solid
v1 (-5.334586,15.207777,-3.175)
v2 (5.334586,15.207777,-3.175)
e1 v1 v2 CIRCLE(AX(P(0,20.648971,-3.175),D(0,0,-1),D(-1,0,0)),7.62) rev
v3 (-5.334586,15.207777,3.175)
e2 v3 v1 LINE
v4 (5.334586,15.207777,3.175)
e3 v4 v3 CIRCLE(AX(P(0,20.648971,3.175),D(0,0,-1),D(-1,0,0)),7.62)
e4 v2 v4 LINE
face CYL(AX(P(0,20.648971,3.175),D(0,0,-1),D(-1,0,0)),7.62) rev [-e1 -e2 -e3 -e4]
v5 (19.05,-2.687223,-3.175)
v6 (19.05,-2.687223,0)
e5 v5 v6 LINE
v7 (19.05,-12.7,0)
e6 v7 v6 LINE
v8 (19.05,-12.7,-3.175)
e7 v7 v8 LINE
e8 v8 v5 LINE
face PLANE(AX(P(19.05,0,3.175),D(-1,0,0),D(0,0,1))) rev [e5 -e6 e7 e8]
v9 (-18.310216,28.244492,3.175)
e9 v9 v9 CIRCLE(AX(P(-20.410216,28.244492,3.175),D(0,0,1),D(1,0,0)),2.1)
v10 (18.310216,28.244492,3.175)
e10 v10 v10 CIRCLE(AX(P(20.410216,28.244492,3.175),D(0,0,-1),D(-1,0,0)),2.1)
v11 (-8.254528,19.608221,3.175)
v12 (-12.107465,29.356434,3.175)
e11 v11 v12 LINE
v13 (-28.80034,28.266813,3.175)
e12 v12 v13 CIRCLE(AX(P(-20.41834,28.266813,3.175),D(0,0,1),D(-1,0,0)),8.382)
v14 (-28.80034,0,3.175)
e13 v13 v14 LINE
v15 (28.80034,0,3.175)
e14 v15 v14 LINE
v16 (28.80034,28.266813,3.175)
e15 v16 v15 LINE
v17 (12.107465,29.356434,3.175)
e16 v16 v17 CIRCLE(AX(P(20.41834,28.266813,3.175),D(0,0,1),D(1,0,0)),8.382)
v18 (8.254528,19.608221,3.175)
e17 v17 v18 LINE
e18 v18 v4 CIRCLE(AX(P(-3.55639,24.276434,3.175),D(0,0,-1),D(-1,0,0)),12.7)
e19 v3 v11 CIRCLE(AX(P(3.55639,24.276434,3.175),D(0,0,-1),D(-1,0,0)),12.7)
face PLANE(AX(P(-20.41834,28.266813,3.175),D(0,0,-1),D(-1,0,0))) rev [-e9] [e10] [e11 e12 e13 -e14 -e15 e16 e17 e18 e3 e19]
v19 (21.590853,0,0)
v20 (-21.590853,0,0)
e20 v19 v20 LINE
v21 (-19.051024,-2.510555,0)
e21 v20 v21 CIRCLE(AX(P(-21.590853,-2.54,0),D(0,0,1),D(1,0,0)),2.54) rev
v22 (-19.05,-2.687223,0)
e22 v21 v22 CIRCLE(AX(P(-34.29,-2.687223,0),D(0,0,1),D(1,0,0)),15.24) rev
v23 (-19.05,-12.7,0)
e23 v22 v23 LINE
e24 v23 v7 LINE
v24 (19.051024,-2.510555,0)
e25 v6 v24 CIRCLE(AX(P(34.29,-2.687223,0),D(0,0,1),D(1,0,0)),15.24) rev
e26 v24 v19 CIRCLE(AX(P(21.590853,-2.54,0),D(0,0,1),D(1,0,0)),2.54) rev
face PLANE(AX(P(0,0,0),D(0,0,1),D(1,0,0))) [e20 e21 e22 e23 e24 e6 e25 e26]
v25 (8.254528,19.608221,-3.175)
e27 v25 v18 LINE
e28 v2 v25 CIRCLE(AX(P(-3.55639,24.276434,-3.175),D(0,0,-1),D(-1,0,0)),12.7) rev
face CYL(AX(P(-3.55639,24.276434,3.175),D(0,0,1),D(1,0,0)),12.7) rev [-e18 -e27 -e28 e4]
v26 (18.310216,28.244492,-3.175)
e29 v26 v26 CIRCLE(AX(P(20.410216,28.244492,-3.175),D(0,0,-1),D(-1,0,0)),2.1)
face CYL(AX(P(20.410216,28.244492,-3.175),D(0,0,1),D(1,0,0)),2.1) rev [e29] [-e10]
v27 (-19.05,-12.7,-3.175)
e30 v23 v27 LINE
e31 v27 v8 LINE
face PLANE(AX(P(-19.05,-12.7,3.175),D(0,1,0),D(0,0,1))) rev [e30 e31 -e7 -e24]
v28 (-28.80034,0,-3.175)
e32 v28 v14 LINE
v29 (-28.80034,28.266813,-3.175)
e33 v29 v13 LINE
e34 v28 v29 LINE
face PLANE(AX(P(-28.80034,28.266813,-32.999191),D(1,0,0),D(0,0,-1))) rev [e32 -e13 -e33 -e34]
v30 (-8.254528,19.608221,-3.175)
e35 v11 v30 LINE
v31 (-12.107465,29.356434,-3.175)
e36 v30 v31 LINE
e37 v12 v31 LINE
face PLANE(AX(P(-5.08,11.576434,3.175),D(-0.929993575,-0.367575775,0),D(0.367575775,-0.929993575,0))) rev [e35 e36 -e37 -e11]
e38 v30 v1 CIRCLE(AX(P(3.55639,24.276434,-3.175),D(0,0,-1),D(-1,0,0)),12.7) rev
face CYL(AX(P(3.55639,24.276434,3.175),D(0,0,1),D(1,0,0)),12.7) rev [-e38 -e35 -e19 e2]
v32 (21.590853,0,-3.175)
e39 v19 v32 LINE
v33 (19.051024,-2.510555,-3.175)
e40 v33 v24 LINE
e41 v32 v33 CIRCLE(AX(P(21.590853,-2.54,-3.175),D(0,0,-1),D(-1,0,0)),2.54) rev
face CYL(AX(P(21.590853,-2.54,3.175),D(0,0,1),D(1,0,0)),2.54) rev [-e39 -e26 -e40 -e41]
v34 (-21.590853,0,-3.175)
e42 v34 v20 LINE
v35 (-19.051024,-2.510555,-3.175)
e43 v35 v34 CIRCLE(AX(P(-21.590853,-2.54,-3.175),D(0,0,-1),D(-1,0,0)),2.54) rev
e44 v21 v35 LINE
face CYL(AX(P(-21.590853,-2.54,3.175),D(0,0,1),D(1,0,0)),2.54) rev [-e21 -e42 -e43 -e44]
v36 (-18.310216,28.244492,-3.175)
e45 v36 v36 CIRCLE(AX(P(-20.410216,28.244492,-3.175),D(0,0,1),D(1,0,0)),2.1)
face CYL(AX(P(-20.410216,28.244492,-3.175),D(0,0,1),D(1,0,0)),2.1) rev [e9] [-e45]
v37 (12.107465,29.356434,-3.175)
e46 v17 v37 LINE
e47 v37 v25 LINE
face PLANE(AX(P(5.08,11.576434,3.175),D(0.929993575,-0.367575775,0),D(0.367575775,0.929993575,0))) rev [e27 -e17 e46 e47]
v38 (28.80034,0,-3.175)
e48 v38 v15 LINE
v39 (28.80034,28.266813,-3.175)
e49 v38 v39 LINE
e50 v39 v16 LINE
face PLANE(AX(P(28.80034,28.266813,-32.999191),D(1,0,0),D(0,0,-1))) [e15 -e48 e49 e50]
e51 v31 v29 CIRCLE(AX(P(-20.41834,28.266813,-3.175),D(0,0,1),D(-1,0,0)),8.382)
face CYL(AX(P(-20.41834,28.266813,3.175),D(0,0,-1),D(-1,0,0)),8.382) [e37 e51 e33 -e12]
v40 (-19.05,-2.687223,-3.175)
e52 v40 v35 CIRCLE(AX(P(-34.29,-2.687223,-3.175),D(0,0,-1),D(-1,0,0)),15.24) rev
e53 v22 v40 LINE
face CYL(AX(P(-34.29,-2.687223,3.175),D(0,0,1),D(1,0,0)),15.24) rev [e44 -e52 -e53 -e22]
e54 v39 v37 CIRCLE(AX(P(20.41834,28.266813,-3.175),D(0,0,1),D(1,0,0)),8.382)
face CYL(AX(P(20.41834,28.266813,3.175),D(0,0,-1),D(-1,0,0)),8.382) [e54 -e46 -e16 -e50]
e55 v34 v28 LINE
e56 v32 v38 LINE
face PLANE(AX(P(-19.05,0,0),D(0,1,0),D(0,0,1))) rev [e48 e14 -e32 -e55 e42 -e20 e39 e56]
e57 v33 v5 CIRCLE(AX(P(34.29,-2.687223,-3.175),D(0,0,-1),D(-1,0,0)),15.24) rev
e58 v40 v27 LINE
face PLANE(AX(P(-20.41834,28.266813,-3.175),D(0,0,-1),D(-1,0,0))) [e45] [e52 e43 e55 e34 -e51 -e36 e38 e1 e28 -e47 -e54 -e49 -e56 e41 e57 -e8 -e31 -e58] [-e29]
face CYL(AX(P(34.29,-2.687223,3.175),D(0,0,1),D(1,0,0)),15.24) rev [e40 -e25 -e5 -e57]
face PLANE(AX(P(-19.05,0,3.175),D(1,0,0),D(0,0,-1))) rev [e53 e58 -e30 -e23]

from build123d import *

# Parameters (mm, degrees)
BOSS_EXTRU_1_DEPTH             = 3.175
ESQUISSE3_R                    = 2.1
ENL_V_MAT_EXTRU_1_DEPTH        = 48.041658028
ESQUISSE4_W                    = 38.1
ESQUISSE4_H                    = 12.7
ENL_V_MAT_EXTRU_2_DEPTH        = 3.175
CONG_1_R                       = 12.7
CONG_4_R                       = 7.62
CONG_5_R                       = 15.24
BOSS_EXTRU_4_REACH             = 48.719
BOSS_EXTRU_4_DIRECTION_2_REACH = 48.719
CONG_6_R                       = 2.54
BOSS_EXTRU_5_REACH             = 49.042


with BuildPart() as part:
    # Esquisse2 → Boss.-Extru.1 (new, symmetric)
    with BuildSketch(Plane.XY):
        with BuildLine():
            Line((19.05, 0), (28.29484395, 25.4))
            ThreePointArc((28.29484395, 25.4), (22.40844386, 36.409135129), (12.107464983, 29.356433767))
            Line((12.107464983, 29.356433767), (5.08, 11.576433767))
            Line((5.08, 11.576433767), (-5.08, 11.576433767))
            Line((-5.08, 11.576433767), (-12.107464983, 29.356433767))
            ThreePointArc((-12.107464983, 29.356433767), (-22.40844386, 36.409135129), (-28.29484395, 25.4))
            Line((-28.29484395, 25.4), (-19.05, 0))
            Line((-19.05, 0), (-19.05, -12.7))
            Line((-19.05, -12.7), (19.05, -12.7))
            Line((19.05, -12.7), (19.05, 0))
        make_face()
    extrude(amount=BOSS_EXTRU_1_DEPTH, both=True)

    # Esquisse3 → Enlèv. mat.-Extru.1 (cut, through all)
    with BuildSketch(Plane.XY.offset(3.175)):
        with Locations((-20.410216204, 28.244491788)):
            Circle(ESQUISSE3_R)
    enl_v_mat_extru_1 = extrude(amount=-ENL_V_MAT_EXTRU_1_DEPTH, mode=Mode.SUBTRACT)

    # Symétrie1: Enlèv. mat.-Extru.1 across plane
    add(enl_v_mat_extru_1.mirror(Plane(origin=(0, 0, 0), x_dir=(0, 0, 1), z_dir=(1, 0, 0))), mode=Mode.SUBTRACT)

    # Esquisse4 → Enlèv. mat.-Extru.2 (cut)
    with BuildSketch(Plane.XY.offset(3.175)):
        with Locations((0, -6.35)):
            Rectangle(ESQUISSE4_W, ESQUISSE4_H)
    extrude(amount=-ENL_V_MAT_EXTRU_2_DEPTH, mode=Mode.SUBTRACT)

    # Congé1
    # the kernel refuses this fillet: 12.7 mm, written as the material it adds along each edge
    with BuildSketch(Plane(origin=(5.08, 11.576433767, -3.175), x_dir=(0.3675757751944704, 0.9299935749725285, 0), z_dir=(0, 0, 1)), Plane(origin=(-5.08, 11.576433767, -3.175), x_dir=(1, 0, 0), z_dir=(0, 0, 1))) as cong_1_piece_1:
        with BuildLine():
            CenterArc((CONG_1_R * 0.68003074626, CONG_1_R), CONG_1_R, 201.566186537, 68.433813463)
            Line((-CONG_1_R * 0.249962828713, CONG_1_R * 0.632424224806), (0, 0))
            Line((0, 0), (CONG_1_R * 0.68003074626, 0))
        make_face()
    extrude(amount=6.35)

    # Congé4
    cong_4_edges = [part.edges().sort_by_distance(p)[0] for p in [
        (0, 12.084547663, 0),
    ]]
    fillet(cong_4_edges, radius=CONG_4_R)

    # Congé5
    cong_5_edges = [part.edges().sort_by_distance(p)[0] for p in [
        (-19.05, 0, -1.5875),
        (19.05, 0, -1.5875),
    ]]
    fillet(cong_5_edges, radius=CONG_5_R)

    # Boss.-Extru.4: up to this face of the body (flat: up to its plane)
    boss_extru_4_end = Plane(part.part.faces().sort_by_distance((9.3e-08, 10.23403755, -3.175))[0])
    # Esquisse6 → Boss.-Extru.4 (add, up to the picked face)
    with BuildSketch(Plane.XY, mode=Mode.PRIVATE) as boss_extru_4_sk1:
        with BuildLine():
            Line((28.800340403, 28.266812841), (28.800340403, 0))
            Line((28.800340403, 0), (19.288785664, 0))
            ThreePointArc((19.288785664, 0), (19.57466996, 1.27720134), (19.969084459, 2.525163798))
            Line((19.969084459, 2.525163798), (28.29484395, 25.4))
            ThreePointArc((28.29484395, 25.4), (28.672998989, 26.811293816), (28.800340403, 28.266812841))
        make_face()
    boss_extru_4_tool1 = split(extrude(boss_extru_4_sk1.sketch, amount=-BOSS_EXTRU_4_REACH, mode=Mode.PRIVATE), bisect_by=boss_extru_4_end, keep=Keep.BOTH, mode=Mode.PRIVATE)
    boss_extru_4 = boss_extru_4_tool1.solids().sort_by(Axis((25.562927, 8.959806, 0), (0, 0, -1)))[0]
    add(boss_extru_4)

    # Boss.-Extru.4 direction 2: up to this face of the body (flat: up to its plane)
    boss_extru_4_direction_2_end = Plane(part.part.faces().sort_by_distance((7.594682873, 16.877070462, 3.175))[0])
    # Esquisse6 → Boss.-Extru.4 direction 2 (add, up to the picked face)
    with BuildSketch(Plane.XY, mode=Mode.PRIVATE) as boss_extru_4_direction_2_sk1:
        with BuildLine():
            Line((28.800340403, 28.266812841), (28.800340403, 0))
            Line((28.800340403, 0), (19.288785664, 0))
            ThreePointArc((19.288785664, 0), (19.57466996, 1.27720134), (19.969084459, 2.525163798))
            Line((19.969084459, 2.525163798), (28.29484395, 25.4))
            ThreePointArc((28.29484395, 25.4), (28.672998989, 26.811293816), (28.800340403, 28.266812841))
        make_face()
    boss_extru_4_direction_2_tool1 = split(extrude(boss_extru_4_direction_2_sk1.sketch, amount=BOSS_EXTRU_4_DIRECTION_2_REACH, mode=Mode.PRIVATE), bisect_by=boss_extru_4_direction_2_end, keep=Keep.BOTH, mode=Mode.PRIVATE)
    boss_extru_4_direction_2 = boss_extru_4_direction_2_tool1.solids().sort_by(Axis((25.562927, 8.959806, 0), (0, 0, 1)))[0]
    add(boss_extru_4_direction_2)

    # Symétrie3: Boss.-Extru.4, Boss.-Extru.4 direction 2 across plane
    add(boss_extru_4.mirror(Plane(origin=(0, 0, 0), x_dir=(0, 0, 1), z_dir=(1, 0, 0))))
    add(boss_extru_4_direction_2.mirror(Plane(origin=(0, 0, 0), x_dir=(0, 0, 1), z_dir=(1, 0, 0))))

    # Congé6
    cong_6_edges = [part.edges().sort_by_distance(p)[0] for p in [
        (-19.288785664, 0, -1.5875),
        (19.288785664, 0, -1.5875),
    ]]
    fillet(cong_6_edges, radius=CONG_6_R)

    # Esquisse7 → Boss.-Extru.5 (add, up to next)
    with BuildSketch(Plane.XY.offset(3.175), mode=Mode.PRIVATE) as boss_extru_5_sk1:
        with BuildLine():
            Line((-19.288785664, 0), (-19.05, 0))
            Line((-19.05, 0), (-19.969084459, 2.525163798))
            ThreePointArc((-19.969084459, 2.525163798), (-19.57466996, 1.27720134), (-19.288785664, 0))
        make_face()
    boss_extru_5_tool1 = extrude(boss_extru_5_sk1.sketch, amount=-BOSS_EXTRU_5_REACH, mode=Mode.PRIVATE) - part.part
    boss_extru_5 = boss_extru_5_tool1.solids().sort_by_distance((-19.353449, 0.636158, 3.175))[0]
    add(boss_extru_5)

    # Symétrie4: Boss.-Extru.5 across plane
    add(boss_extru_5.mirror(Plane(origin=(0, 0, 0), x_dir=(0, 0, 1), z_dir=(1, 0, 0))))


solid = part.part
